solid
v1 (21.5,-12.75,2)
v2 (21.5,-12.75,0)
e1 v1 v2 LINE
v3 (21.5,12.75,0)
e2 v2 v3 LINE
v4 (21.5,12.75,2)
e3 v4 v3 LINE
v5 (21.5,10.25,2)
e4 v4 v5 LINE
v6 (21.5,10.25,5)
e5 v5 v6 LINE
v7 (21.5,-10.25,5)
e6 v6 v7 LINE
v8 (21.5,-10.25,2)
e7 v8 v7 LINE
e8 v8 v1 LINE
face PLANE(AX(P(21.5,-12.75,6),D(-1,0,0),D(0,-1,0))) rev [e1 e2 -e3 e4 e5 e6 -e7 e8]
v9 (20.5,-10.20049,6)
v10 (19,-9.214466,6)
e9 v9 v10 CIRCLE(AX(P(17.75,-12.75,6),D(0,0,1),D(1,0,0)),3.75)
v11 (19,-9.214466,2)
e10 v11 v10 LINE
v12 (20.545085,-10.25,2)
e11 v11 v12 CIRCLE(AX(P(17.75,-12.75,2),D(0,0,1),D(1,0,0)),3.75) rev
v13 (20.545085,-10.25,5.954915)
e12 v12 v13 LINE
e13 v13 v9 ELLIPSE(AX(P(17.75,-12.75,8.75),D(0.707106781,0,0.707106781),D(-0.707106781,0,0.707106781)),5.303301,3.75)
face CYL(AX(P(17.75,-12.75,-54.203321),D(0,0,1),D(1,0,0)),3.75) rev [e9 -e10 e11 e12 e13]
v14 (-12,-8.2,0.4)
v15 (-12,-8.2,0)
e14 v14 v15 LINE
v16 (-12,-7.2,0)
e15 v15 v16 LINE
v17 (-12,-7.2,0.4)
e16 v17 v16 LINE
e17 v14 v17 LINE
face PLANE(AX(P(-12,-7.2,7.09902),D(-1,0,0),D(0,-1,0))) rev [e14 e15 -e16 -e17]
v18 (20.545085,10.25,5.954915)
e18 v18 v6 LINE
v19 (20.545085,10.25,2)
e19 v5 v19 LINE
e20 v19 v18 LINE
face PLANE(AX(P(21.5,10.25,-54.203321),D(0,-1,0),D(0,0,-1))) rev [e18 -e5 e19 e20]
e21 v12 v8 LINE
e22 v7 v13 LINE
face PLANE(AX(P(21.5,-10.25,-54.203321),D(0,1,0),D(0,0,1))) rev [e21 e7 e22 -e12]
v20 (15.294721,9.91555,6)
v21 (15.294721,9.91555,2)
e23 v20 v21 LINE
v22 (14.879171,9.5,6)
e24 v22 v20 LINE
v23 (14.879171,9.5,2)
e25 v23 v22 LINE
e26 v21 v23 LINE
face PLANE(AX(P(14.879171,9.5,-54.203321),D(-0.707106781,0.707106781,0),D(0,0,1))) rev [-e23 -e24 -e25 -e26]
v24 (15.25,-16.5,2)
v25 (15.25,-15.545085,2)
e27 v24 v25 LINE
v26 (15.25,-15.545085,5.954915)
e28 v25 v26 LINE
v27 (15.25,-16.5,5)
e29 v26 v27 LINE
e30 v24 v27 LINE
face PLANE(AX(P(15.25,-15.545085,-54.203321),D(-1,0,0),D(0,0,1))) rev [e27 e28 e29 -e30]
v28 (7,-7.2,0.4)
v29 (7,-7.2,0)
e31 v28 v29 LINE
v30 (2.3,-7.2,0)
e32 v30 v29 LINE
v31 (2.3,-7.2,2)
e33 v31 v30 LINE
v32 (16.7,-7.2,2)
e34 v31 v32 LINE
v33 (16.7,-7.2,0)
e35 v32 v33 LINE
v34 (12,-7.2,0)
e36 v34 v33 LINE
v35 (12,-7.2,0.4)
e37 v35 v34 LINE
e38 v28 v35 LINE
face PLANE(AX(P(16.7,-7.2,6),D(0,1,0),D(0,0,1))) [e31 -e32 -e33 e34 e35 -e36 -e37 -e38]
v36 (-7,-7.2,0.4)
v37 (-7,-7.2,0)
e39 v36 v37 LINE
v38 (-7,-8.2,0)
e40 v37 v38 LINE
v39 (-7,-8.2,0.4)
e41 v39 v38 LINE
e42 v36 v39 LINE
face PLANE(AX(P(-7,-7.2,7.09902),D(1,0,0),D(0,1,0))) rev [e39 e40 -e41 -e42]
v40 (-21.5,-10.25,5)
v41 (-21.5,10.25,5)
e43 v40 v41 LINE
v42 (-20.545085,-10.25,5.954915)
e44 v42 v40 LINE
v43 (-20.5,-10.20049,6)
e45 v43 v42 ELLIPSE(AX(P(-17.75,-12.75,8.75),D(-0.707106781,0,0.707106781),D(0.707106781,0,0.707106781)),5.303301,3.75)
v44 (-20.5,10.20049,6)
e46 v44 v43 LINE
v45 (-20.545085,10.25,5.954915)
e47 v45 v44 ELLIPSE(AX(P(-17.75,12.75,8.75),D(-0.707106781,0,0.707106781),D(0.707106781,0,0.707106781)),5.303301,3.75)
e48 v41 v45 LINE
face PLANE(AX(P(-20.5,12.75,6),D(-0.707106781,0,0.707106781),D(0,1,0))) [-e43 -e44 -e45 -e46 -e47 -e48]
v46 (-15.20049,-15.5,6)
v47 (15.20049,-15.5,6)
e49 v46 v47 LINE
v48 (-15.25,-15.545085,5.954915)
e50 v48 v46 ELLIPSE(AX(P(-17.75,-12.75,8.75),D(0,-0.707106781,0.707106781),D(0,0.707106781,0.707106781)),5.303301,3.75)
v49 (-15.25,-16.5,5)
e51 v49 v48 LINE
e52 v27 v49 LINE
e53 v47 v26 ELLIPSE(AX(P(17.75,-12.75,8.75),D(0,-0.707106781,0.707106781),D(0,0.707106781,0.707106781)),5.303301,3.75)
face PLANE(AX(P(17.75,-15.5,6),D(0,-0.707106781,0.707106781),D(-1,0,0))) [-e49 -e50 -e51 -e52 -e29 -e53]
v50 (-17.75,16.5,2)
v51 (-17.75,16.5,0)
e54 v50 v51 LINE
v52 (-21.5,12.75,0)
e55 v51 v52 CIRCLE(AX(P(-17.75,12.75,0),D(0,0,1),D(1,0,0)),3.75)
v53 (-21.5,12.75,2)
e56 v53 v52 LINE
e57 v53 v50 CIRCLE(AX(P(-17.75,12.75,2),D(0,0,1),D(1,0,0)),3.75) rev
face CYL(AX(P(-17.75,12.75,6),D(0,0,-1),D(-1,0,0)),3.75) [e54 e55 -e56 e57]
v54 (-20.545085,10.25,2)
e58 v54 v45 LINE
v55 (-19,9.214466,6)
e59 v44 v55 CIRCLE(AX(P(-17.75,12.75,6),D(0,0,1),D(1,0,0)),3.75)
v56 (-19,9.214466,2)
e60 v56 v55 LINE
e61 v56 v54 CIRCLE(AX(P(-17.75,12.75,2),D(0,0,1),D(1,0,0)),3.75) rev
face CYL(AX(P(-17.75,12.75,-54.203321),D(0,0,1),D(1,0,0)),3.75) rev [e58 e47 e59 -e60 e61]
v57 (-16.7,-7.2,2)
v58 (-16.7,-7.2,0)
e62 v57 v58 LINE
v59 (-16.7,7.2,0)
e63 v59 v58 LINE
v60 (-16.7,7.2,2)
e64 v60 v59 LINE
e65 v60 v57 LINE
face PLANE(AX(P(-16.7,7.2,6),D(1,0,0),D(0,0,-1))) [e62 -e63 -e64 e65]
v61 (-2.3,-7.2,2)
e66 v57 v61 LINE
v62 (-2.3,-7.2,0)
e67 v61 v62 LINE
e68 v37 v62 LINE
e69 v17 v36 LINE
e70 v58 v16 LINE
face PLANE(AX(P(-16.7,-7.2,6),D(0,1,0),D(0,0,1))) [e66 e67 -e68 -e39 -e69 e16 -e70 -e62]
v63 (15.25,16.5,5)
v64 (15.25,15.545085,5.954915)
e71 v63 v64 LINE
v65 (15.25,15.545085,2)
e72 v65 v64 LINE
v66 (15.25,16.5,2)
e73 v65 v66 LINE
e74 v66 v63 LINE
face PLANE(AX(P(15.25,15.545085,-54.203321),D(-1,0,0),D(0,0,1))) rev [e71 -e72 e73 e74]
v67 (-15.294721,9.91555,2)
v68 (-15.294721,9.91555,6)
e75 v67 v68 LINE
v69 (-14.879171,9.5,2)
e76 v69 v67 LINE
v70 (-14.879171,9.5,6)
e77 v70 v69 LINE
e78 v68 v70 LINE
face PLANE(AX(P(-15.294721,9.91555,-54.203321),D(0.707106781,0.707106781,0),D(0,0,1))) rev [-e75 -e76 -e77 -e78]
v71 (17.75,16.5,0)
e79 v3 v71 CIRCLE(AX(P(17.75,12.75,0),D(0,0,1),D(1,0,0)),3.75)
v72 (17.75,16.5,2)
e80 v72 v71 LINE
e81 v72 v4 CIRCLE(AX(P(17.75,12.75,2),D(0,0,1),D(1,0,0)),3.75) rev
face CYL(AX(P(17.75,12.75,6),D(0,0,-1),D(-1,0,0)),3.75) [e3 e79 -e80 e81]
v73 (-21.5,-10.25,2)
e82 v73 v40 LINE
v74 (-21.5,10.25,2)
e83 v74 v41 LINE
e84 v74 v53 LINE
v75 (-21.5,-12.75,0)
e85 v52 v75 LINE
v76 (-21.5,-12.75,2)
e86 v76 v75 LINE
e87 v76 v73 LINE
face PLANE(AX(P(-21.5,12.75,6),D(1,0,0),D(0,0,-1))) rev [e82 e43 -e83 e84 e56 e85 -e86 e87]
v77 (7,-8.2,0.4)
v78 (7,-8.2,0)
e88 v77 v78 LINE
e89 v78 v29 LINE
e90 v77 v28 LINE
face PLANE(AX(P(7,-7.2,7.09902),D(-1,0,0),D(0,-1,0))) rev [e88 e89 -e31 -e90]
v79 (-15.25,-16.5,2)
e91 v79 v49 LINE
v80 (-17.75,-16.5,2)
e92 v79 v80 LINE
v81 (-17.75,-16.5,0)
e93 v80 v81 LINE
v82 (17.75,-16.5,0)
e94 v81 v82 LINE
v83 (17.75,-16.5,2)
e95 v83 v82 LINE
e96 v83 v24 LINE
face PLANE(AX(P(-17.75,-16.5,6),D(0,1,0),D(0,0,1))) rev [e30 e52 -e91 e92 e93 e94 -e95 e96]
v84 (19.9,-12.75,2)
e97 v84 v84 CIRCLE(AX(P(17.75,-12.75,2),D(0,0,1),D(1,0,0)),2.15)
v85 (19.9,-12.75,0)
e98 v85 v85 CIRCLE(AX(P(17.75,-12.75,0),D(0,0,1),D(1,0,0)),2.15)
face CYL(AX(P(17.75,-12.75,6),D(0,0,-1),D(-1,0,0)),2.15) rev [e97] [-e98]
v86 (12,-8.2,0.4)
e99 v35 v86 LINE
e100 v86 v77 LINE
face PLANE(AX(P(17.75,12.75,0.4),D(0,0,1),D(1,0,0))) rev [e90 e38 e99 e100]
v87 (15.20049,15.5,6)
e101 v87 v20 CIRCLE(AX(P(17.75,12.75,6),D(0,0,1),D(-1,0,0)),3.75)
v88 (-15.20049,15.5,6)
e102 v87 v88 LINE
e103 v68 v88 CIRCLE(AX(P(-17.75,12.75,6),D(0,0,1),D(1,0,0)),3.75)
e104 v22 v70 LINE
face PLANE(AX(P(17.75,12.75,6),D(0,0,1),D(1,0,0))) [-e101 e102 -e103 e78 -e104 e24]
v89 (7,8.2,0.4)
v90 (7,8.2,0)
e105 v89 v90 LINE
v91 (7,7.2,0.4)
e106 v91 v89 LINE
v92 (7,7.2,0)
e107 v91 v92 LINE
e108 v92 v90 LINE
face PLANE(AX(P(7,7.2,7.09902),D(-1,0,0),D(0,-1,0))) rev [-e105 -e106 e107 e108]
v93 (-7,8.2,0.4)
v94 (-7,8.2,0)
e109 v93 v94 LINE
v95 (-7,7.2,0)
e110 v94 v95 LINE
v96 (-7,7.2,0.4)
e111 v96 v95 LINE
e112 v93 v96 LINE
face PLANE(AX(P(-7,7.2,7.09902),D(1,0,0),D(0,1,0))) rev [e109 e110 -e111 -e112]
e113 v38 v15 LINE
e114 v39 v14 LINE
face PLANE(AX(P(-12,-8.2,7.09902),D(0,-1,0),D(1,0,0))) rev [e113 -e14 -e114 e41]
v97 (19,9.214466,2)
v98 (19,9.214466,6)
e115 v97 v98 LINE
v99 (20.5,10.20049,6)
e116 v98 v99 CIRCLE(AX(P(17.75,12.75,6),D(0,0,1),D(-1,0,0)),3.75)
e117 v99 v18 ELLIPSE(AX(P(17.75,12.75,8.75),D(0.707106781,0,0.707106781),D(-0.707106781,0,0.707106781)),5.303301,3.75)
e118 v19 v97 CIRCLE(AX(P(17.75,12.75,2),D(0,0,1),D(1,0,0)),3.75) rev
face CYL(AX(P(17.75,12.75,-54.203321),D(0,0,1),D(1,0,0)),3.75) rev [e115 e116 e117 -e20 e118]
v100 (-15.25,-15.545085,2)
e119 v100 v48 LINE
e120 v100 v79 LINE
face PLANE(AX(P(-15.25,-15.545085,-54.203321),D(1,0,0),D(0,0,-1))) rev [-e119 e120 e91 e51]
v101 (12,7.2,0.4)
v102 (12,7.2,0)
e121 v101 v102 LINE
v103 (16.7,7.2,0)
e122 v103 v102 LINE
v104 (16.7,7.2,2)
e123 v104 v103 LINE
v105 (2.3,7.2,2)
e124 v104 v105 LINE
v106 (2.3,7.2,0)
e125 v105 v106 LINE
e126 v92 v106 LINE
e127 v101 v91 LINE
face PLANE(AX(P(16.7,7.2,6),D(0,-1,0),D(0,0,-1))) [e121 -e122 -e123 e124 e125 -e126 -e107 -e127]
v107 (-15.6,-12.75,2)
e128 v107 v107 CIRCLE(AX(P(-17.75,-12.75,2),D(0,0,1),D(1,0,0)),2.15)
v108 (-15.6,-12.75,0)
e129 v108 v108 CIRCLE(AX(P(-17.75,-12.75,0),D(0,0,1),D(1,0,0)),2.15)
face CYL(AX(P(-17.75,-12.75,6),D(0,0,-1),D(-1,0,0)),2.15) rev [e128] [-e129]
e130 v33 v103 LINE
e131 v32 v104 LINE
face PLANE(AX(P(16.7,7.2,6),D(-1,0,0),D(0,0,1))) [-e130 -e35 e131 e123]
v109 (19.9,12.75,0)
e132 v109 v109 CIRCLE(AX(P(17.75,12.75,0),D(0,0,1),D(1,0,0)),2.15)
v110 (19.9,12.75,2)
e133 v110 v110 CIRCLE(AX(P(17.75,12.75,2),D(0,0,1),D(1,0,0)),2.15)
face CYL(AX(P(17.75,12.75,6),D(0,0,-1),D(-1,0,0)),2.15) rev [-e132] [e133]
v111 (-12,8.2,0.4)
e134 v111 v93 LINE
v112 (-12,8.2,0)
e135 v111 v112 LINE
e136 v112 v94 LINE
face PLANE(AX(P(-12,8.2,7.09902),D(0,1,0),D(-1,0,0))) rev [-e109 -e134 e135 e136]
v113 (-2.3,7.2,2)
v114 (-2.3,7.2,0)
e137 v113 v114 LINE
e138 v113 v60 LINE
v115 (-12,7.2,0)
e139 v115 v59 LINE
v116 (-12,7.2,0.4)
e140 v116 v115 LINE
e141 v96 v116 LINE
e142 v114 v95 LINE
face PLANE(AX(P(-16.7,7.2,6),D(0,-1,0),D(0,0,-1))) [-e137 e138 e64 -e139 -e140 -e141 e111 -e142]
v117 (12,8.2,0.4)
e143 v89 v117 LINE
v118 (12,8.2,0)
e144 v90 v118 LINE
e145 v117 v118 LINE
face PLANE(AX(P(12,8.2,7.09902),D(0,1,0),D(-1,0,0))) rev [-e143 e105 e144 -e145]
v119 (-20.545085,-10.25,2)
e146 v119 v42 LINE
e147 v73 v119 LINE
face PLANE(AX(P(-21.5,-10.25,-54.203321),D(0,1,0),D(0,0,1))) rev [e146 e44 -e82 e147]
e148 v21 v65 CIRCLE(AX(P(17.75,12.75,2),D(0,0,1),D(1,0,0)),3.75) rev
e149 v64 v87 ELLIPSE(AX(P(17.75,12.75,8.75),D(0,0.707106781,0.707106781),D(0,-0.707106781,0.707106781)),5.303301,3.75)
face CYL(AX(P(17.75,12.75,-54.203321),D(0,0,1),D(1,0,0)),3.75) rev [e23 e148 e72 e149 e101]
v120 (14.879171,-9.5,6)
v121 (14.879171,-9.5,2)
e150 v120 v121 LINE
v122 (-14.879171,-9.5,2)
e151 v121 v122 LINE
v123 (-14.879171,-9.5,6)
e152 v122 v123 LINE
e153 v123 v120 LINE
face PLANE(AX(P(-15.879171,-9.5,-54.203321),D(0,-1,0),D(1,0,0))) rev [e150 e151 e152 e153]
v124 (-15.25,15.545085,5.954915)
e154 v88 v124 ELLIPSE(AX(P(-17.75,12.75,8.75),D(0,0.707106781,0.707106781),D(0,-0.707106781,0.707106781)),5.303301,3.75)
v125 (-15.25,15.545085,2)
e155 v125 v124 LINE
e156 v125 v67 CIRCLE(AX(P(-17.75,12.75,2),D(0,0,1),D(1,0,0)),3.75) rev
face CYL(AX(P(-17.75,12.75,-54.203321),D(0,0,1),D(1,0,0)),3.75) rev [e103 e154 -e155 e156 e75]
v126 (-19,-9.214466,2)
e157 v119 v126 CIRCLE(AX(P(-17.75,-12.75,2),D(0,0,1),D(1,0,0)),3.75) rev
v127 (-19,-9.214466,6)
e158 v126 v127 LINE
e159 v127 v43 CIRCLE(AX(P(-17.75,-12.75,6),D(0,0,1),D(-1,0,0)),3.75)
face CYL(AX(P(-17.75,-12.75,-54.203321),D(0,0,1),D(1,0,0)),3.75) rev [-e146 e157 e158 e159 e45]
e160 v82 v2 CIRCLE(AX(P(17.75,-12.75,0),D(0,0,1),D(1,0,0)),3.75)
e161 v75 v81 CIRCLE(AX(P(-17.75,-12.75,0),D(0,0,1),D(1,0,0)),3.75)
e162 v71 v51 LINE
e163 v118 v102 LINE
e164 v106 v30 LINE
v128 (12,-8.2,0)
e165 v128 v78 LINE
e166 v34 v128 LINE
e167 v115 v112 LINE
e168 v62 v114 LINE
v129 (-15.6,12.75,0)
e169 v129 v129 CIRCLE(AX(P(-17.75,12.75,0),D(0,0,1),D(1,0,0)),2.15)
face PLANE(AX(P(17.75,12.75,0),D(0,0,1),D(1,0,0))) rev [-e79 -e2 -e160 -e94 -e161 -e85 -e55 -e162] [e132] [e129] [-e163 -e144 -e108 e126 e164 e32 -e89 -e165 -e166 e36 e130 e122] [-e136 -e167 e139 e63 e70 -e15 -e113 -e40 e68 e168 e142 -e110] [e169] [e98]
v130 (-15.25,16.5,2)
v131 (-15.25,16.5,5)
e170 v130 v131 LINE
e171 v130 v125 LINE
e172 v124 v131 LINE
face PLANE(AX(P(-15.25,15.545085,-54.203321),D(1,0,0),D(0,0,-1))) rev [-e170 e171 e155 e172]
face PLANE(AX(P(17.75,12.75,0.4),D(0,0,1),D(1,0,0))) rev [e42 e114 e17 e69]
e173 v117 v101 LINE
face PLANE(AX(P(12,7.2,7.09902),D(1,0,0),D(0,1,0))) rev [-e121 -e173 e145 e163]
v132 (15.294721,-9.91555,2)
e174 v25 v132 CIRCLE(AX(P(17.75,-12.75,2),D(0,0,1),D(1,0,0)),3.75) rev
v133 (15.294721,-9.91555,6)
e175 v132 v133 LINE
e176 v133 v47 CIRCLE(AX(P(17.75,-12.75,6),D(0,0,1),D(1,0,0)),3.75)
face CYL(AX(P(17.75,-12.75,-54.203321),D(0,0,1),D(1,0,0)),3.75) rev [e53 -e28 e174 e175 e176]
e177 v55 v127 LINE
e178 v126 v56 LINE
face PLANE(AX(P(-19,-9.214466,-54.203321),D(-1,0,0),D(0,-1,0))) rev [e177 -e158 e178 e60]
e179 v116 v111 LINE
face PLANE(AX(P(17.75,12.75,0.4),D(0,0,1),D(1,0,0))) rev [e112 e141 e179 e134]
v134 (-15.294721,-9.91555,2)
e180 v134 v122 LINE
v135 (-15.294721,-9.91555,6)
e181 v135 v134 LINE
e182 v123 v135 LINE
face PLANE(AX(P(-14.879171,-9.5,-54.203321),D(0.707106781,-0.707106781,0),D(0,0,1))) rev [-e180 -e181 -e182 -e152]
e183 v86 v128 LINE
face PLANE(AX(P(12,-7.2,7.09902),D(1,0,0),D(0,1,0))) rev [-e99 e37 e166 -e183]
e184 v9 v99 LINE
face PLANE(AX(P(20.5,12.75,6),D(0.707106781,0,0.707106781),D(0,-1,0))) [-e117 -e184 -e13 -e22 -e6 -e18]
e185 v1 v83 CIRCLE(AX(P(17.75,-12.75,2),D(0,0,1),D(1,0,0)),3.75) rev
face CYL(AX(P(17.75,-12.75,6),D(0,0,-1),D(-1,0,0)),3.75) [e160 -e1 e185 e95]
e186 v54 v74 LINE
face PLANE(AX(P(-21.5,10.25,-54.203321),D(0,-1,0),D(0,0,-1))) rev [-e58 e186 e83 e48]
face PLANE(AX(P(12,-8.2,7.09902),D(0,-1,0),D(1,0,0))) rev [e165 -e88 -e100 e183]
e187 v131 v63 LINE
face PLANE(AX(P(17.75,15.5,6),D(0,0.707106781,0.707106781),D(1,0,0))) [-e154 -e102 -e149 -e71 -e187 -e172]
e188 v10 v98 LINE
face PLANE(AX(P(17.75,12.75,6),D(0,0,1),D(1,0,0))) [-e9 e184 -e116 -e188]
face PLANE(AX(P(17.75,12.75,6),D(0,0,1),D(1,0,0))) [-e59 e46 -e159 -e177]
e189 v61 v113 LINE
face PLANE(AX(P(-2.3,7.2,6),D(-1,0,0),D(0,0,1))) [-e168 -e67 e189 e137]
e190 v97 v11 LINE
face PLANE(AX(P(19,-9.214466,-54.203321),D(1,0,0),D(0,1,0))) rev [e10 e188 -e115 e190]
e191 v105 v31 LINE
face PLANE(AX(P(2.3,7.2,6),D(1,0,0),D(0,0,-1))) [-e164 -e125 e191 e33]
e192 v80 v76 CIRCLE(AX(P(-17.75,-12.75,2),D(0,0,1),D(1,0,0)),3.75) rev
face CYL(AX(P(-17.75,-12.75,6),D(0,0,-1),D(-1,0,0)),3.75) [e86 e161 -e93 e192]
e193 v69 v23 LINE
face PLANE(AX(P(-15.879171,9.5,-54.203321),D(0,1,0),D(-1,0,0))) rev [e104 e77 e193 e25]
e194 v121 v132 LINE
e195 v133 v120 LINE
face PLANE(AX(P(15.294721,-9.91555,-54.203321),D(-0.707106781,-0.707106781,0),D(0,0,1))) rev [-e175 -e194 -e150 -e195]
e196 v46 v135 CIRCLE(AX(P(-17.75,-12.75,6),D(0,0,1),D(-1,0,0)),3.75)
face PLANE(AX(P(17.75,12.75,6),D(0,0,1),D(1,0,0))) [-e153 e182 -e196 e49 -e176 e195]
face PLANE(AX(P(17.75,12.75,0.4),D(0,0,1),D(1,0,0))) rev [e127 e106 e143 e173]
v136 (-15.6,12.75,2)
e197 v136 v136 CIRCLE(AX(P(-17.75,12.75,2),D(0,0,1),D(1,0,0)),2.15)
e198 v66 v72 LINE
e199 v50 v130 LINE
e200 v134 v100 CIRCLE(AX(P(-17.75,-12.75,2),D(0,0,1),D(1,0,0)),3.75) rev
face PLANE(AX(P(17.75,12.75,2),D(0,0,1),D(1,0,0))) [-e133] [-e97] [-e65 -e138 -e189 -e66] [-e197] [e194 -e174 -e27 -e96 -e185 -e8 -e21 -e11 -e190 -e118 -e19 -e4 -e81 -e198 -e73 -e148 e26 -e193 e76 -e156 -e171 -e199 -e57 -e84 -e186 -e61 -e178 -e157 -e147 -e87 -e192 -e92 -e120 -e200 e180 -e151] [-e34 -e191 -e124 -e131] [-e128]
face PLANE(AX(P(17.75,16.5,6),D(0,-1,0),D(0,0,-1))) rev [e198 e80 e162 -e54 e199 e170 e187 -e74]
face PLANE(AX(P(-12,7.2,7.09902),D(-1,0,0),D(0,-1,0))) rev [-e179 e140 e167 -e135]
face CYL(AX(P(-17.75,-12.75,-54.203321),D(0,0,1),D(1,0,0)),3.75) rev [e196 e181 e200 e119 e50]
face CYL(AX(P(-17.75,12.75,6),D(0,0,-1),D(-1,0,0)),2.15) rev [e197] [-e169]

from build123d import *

# Parameters (mm, degrees)
SKETCH_1_R          = 2.15
SKETCH_1_W          = 14.4
SKETCH_1_H          = 14.4
EXTRUDE_1_DEPTH     = 6
CUT_EXTRUDE_START   = -4
CUT_EXTRUDE_1_DEPTH = 4
CHAMFER_1_SIZE      = 1
SKETCH_4_W          = 5
SKETCH_4_H          = 1
CUT_EXTRUDE_2_DEPTH = 0.4


with BuildPart() as part:
    # Эскиз1 → Бобышка-Вытянуть1 (new body)
    with BuildSketch(Plane.XY):
        with BuildLine():
            Line((17.75, 16.5), (-17.75, 16.5))
            ThreePointArc((-17.75, 16.5), (-20.401650429, 15.401650429), (-21.5, 12.75))
            Line((-21.5, 12.75), (-21.5, -12.75))
            ThreePointArc((-21.5, -12.75), (-20.401650429, -15.401650429), (-17.75, -16.5))
            Line((-17.75, -16.5), (17.75, -16.5))
            ThreePointArc((17.75, -16.5), (20.401650429, -15.401650429), (21.5, -12.75))
            Line((21.5, -12.75), (21.5, 12.75))
            ThreePointArc((21.5, 12.75), (20.401650429, 15.401650429), (17.75, 16.5))
        make_face()
        with Locations((-17.75, 12.75)):
            Circle(SKETCH_1_R, mode=Mode.SUBTRACT)
        with Locations((17.75, 12.75)):
            Circle(SKETCH_1_R, mode=Mode.SUBTRACT)
        with Locations((-17.75, -12.75)):
            Circle(SKETCH_1_R, mode=Mode.SUBTRACT)
        with Locations((17.75, -12.75)):
            Circle(SKETCH_1_R, mode=Mode.SUBTRACT)
        with Locations((-9.5, 0)):
            Rectangle(SKETCH_1_W, SKETCH_1_H, mode=Mode.SUBTRACT)
        with Locations((9.5, 0)):
            Rectangle(SKETCH_1_W, SKETCH_1_H, mode=Mode.SUBTRACT)
    extrude(amount=EXTRUDE_1_DEPTH)

    # Эскиз2 → Вырез-Вытянуть1 (cut)
    with BuildSketch(Plane.XY.offset(6).offset(CUT_EXTRUDE_START)):
        with BuildLine():
            Line((-21.5, 10.25), (-20.545084972, 10.25))
            ThreePointArc((-20.545084972, 10.25), (-19.837764528, 9.634917453), (-19, 9.214466094))
            Line((-19, 9.214466094), (-19, -9.214466094))
            ThreePointArc((-19, -9.214466094), (-19.837764528, -9.634917453), (-20.545084972, -10.25))
            Line((-20.545084972, -10.25), (-21.5, -10.25))
            Line((-21.5, -10.25), (-21.5, -12.75))
            ThreePointArc((-21.5, -12.75), (-20.401650429, -15.401650429), (-17.75, -16.5))
            Line((-17.75, -16.5), (-15.25, -16.5))
            Line((-15.25, -16.5), (-15.25, -15.545084972))
            ThreePointArc((-15.25, -15.545084972), (-14.020147597, -12.361797664), (-15.879171307, -9.5))
            Line((-15.879171307, -9.5), (15.879171307, -9.5))
            ThreePointArc((15.879171307, -9.5), (14.020147597, -12.361797664), (15.25, -15.545084972))
            Line((15.25, -15.545084972), (15.25, -16.5))
            Line((15.25, -16.5), (17.75, -16.5))
            ThreePointArc((17.75, -16.5), (20.401650429, -15.401650429), (21.5, -12.75))
            Line((21.5, -12.75), (21.5, -10.25))
            Line((21.5, -10.25), (20.545084972, -10.25))
            ThreePointArc((20.545084972, -10.25), (19.837764528, -9.634917453), (19, -9.214466094))
            Line((19, -9.214466094), (19, 9.214466094))
            ThreePointArc((19, 9.214466094), (19.837764528, 9.634917453), (20.545084972, 10.25))
            Line((20.545084972, 10.25), (21.5, 10.25))
            Line((21.5, 10.25), (21.5, 12.75))
            ThreePointArc((21.5, 12.75), (20.401650429, 15.401650429), (17.75, 16.5))
            Line((17.75, 16.5), (15.25, 16.5))
            Line((15.25, 16.5), (15.25, 15.545084972))
            ThreePointArc((15.25, 15.545084972), (14.020147597, 12.361797664), (15.879171307, 9.5))
            Line((15.879171307, 9.5), (-15.879171307, 9.5))
            ThreePointArc((-15.879171307, 9.5), (-14.020147597, 12.361797664), (-15.25, 15.545084972))
            Line((-15.25, 15.545084972), (-15.25, 16.5))
            Line((-15.25, 16.5), (-17.75, 16.5))
            ThreePointArc((-17.75, 16.5), (-20.401650429, 15.401650429), (-21.5, 12.75))
            Line((-21.5, 12.75), (-21.5, 10.25))
        make_face()
    extrude(amount=CUT_EXTRUDE_1_DEPTH, mode=Mode.SUBTRACT)

    # Фаска1
    # the kernel refuses this chamfer: 1, 0.732303349 mm, written as the material it takes off along each edge
    with BuildSketch(Plane(origin=(15.879171307, 9.5, 2), x_dir=(-0.8149940779202551, 0.5794692856009827, 0), z_dir=(0, 0, 1))) as chamfer_1_piece_1:
        with BuildLine():
            Line((0.717121745, 0), (CHAMFER_1_SIZE * 0.81499407792, CHAMFER_1_SIZE * 0.579469285601))
            Line((CHAMFER_1_SIZE * 0.81499407792, CHAMFER_1_SIZE * 0.579469285601), (0, 0))
            ThreePointArc((0, 0), (0.355196947, 0.017179972), (0.717121745, 0))
        make_face()
    extrude(amount=6.571682988, mode=Mode.SUBTRACT)
    with BuildSketch(Plane(origin=(-15.879171307, 9.5, 2), x_dir=(1, 0, 0), z_dir=(0, 0, 1))) as chamfer_1_piece_2:
        with BuildLine():
            Line((CHAMFER_1_SIZE, 0), (0.584449975, 0.415550025))
            ThreePointArc((0.584449975, 0.415550025), (0.299438674, 0.191824146), (0, 0))
            Line((0, 0), (CHAMFER_1_SIZE, 0))
        make_face()
    extrude(amount=6.571682988, mode=Mode.SUBTRACT)
    with BuildSketch(Plane(origin=(15.879171307, -9.5, 2), x_dir=(-0.8149940779202558, -0.5794692856009814, 0), z_dir=(0, 0, 1))) as chamfer_1_piece_3:
        with BuildLine():
            Line((0.717121745, 0), (CHAMFER_1_SIZE * 0.81499407792, -CHAMFER_1_SIZE * 0.579469285601))
            Line((CHAMFER_1_SIZE * 0.81499407792, -CHAMFER_1_SIZE * 0.579469285601), (0, 0))
            ThreePointArc((0, 0), (0.355196947, -0.017179972), (0.717121745, 0))
        make_face()
    extrude(amount=6.571682988, mode=Mode.SUBTRACT)
    with BuildSketch(Plane(origin=(-15.879171307, -9.5, 2), x_dir=(1, 0, 0), z_dir=(0, 0, 1))) as chamfer_1_piece_4:
        with BuildLine():
            Line((CHAMFER_1_SIZE, 0), (0.584449975, -0.415550025))
            ThreePointArc((0.584449975, -0.415550025), (0.299438674, -0.191824146), (0, 0))
            Line((0, 0), (CHAMFER_1_SIZE, 0))
        make_face()
    extrude(amount=6.571682988, mode=Mode.SUBTRACT)
    with BuildSketch(Plane(origin=(21.5, -12.821682988, 6), x_dir=(0, 0, -1), z_dir=(0, 1, 0)), Plane(origin=(-21.5, 12.821682988, 6), x_dir=(0, 0, -1), z_dir=(0, -1, 0))) as chamfer_1_piece_5:
        Polygon((CHAMFER_1_SIZE, 0), (0, CHAMFER_1_SIZE), (0, 0), align=None)
    extrude(amount=25.643365976, mode=Mode.SUBTRACT)
    with BuildSketch(Plane(origin=(-17.821682988, -16.5, 6), x_dir=(0, 0, -1), z_dir=(1, 0, 0)), Plane(origin=(17.821682988, 16.5, 6), x_dir=(0, 0, -1), z_dir=(-1, 0, 0))) as chamfer_1_piece_6:
        Polygon((CHAMFER_1_SIZE, 0), (0, CHAMFER_1_SIZE), (0, 0), align=None)
    extrude(amount=35.643365976, mode=Mode.SUBTRACT)

    # Эскиз4 → Вырез-Вытянуть2 (cut)
    with BuildSketch(Plane(origin=(0, 0, 0), x_dir=(-1, 0, 0), z_dir=(0, 0, -1))):
        with Locations((9.5, -7.7)):
            Rectangle(SKETCH_4_W, SKETCH_4_H)
        with Locations((9.5, 7.7)):
            Rectangle(SKETCH_4_W, SKETCH_4_H)
        with Locations((-9.5, 7.7)):
            Rectangle(SKETCH_4_W, SKETCH_4_H)
        with Locations((-9.5, -7.7)):
            Rectangle(SKETCH_4_W, SKETCH_4_H)
    extrude(amount=-CUT_EXTRUDE_2_DEPTH, mode=Mode.SUBTRACT)


solid = part.part
